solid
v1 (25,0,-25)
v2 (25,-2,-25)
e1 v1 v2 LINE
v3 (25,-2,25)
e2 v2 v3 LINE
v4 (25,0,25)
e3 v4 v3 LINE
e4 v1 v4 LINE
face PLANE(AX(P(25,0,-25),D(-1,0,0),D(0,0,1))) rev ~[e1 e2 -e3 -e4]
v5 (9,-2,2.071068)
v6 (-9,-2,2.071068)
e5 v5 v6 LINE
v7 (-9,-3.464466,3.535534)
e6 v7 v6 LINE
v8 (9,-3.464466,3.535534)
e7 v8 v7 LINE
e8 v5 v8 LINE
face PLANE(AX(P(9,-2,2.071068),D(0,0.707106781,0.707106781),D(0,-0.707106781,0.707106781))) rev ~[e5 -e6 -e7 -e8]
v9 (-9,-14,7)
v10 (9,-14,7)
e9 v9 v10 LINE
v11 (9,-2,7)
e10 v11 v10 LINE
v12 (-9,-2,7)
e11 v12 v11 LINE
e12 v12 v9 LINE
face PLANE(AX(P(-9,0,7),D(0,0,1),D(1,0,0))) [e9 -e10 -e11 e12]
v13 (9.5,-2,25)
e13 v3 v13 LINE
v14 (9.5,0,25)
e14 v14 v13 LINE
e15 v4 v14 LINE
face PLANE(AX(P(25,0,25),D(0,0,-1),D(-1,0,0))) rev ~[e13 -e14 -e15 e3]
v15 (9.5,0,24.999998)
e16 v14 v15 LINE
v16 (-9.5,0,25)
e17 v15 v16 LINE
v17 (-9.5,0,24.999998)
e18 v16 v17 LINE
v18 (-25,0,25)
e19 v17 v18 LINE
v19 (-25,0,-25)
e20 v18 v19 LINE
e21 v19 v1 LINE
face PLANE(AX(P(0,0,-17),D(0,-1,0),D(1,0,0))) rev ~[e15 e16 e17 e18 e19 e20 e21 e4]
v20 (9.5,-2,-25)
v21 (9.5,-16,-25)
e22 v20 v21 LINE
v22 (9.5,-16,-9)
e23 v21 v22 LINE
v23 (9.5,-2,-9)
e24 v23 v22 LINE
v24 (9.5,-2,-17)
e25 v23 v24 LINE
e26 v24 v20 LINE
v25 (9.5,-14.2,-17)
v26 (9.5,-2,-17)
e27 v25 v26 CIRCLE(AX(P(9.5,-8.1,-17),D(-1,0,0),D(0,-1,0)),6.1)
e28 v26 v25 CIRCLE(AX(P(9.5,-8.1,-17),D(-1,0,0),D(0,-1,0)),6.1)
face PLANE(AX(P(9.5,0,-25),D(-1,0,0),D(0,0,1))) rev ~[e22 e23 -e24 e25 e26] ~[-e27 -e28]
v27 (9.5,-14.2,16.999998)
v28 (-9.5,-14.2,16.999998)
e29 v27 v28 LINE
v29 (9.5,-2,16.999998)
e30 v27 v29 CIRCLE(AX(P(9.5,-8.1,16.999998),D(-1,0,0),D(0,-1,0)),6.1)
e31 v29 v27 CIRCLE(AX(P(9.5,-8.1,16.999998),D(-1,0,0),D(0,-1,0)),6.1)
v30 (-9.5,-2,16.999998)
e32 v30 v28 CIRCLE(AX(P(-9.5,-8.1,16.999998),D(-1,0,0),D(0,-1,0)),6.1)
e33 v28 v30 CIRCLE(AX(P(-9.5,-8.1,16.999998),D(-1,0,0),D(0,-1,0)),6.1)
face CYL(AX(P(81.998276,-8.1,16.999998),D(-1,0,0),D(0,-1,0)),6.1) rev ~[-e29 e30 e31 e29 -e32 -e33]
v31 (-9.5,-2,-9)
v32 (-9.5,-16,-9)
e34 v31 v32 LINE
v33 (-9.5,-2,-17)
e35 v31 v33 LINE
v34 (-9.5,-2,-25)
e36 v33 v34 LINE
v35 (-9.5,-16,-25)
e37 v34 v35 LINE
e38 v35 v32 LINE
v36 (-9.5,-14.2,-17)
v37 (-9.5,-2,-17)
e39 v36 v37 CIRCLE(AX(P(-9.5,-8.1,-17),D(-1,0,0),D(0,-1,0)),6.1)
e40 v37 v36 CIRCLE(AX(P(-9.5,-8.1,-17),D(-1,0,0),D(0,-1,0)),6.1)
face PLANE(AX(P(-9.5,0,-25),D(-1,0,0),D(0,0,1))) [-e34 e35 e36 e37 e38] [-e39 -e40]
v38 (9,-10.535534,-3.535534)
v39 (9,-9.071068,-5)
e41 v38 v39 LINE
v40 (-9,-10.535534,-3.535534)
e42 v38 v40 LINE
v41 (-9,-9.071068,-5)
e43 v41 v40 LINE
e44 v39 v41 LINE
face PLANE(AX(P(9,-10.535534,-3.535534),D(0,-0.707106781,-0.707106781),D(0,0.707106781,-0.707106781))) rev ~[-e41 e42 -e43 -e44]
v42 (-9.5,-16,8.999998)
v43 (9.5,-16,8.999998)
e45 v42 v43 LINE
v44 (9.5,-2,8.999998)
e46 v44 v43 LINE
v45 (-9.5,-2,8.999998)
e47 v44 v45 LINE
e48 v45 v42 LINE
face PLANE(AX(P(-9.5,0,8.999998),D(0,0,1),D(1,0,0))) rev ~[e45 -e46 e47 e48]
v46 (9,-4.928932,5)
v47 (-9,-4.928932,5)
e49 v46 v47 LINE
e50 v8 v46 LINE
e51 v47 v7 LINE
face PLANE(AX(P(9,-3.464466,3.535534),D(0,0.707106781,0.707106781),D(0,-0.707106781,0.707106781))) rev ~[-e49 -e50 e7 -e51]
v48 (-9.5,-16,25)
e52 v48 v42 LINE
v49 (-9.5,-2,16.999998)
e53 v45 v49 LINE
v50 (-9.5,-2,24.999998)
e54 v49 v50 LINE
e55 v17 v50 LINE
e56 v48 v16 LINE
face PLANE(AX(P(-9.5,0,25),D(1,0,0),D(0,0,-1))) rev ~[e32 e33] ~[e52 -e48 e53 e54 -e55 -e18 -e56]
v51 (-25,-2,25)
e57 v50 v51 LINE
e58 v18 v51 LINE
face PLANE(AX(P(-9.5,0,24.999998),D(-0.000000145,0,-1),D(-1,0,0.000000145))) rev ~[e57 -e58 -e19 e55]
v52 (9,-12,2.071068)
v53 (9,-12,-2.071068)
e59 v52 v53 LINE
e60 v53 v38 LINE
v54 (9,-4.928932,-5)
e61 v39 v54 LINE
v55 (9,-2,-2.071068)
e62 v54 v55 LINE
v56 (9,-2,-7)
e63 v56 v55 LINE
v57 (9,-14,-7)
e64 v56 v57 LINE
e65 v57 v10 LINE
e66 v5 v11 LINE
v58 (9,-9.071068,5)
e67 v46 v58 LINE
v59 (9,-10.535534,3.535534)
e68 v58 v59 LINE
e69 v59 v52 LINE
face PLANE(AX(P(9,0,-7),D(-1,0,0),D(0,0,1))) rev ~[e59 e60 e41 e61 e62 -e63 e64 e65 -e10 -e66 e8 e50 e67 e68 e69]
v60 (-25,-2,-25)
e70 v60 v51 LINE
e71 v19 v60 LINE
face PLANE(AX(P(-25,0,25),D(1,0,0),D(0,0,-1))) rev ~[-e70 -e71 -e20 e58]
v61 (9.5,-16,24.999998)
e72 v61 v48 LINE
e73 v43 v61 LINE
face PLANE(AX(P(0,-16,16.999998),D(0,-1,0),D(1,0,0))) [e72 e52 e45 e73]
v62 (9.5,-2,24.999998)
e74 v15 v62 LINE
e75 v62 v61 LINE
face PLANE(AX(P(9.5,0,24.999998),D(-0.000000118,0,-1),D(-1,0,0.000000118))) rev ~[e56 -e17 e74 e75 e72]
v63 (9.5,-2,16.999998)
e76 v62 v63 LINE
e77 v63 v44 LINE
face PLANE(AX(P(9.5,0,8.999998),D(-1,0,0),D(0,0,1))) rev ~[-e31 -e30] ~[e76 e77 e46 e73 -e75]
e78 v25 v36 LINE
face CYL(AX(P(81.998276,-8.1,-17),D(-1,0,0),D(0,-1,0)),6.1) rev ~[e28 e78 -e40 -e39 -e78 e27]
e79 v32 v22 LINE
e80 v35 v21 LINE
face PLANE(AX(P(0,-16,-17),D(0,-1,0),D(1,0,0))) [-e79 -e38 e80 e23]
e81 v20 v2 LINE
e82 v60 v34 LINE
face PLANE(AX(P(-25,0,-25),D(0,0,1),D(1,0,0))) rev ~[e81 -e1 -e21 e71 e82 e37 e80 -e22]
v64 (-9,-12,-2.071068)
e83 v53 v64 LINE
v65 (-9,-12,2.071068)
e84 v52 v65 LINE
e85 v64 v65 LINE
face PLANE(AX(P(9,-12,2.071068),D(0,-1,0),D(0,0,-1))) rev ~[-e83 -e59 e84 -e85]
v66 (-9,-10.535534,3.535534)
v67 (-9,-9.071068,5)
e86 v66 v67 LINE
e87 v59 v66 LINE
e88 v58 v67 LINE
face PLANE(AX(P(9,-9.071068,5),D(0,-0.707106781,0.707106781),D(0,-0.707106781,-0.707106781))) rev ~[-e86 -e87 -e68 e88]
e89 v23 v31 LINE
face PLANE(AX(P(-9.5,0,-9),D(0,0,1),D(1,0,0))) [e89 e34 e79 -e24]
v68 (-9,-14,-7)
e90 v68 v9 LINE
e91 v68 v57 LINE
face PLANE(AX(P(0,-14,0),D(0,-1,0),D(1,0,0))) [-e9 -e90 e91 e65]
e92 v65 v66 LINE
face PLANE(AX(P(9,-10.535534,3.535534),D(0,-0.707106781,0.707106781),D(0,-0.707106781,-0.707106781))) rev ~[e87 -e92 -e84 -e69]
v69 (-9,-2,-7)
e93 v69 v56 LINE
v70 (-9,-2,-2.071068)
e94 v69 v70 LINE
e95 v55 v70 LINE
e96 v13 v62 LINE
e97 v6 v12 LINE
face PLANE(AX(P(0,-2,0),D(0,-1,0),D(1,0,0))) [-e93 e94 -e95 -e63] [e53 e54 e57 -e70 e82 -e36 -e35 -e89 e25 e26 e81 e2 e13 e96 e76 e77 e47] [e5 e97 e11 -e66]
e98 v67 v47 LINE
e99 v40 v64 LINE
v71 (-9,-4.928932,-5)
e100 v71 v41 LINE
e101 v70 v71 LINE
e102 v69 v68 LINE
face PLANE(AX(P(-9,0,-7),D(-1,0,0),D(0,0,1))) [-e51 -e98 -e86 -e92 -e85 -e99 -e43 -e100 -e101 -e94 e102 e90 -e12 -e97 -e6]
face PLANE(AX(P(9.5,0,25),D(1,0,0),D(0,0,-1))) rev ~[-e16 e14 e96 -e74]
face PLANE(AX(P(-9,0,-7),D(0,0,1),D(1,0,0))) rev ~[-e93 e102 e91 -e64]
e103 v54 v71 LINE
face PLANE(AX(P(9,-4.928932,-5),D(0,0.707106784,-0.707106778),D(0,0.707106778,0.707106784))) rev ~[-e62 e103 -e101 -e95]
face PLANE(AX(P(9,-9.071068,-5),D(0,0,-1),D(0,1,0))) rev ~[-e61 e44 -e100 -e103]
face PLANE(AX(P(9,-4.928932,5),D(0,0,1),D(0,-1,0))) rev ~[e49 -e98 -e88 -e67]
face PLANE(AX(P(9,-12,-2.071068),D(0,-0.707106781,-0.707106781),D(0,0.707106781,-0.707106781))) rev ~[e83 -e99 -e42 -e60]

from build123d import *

# Parameters (mm, degrees)
F0_W     = 18
F0_H     = 14
F0_W_2   = 19
F0_H_2   = 16
F1_DEPTH = 2
F2_DEPTH = 14
F3_DEPTH = 16
F5_D     = 12.2
F7_D     = 12.2
F9_DEPTH = 25


# Not quite as in the source:
# - ends of sketch curves that miss each other by under 0.0002 mm in the source are joined


with BuildPart() as f1:
    # F0 (on Front) → F1 (new body)
    with BuildSketch(Plane.XZ):
        Polygon((9.5000003055, -25), (25, -25), (25, 25), (9.5000003055, 25), (9.5000003055, 8.9999977499), (-9.4999996945, 8.9999977499), (-9.4999996945, 24.9999977499), (-25, 25), (-25, -25), (-9.4999996945, -25), (-9.4999996945, -9), (9.5000003055, -9), align=None)
        Rectangle(F0_W, F0_H, mode=Mode.SUBTRACT)
        with Locations((3.055e-07, -17)):
            Rectangle(F0_W_2, F0_H_2)
        Polygon((9.5000003055, 8.9999977499), (9.5000003055, 24.9999977499), (-9.4999996945, 25), (-9.4999996945, 8.9999977499), align=None)
    extrude(amount=F1_DEPTH)

    # F0 (on Front) → F2 (join)
    with BuildSketch(Plane.XZ):
        Rectangle(F0_W, F0_H)
    extrude(amount=F2_DEPTH)

    # F0 (on Front) → F3 (join)
    with BuildSketch(Plane.XZ):
        with Locations((3.055e-07, -17)):
            Rectangle(F0_W_2, F0_H_2)
        Polygon((9.5000003055, 8.9999977499), (9.5000003055, 24.9999977499), (-9.4999996945, 25), (-9.4999996945, 8.9999977499), align=None)
    extrude(amount=F3_DEPTH)

    # F5 (through all)
    with Locations(Plane.YZ.offset(9.5000003055)):
        with Locations((-8.1, -17)):
            Hole(F5_D / 2)

    # F7 (through all)
    with Locations(Plane.YZ.offset(9.5000003055)):
        with Locations((-8.1, 16.9999977499)):
            Hole(F7_D / 2)

    # F8 (on face) → F9 (cut)
    with BuildSketch(Plane.YZ.offset(9)):
        with BuildLine():
            Line((-12.0000001043, -2.0710677001), (-10.5355339977, -3.5355338068))
            ThreePointArc((-10.5355339977, -3.5355338068), (-11.6193977653, -1.9134170539), (-12.0000001043, 1.212e-07))
            Line((-12.0000001043, 1.212e-07), (-12.0000001043, -2.0710677001))
        make_face()
        with BuildLine():
            ThreePointArc((-2.0000001043, 1.118e-07), (-2.3806024392, 1.9134172673), (-3.4644661888, 3.5355340081))
            ThreePointArc((-3.4644661888, 3.5355340081), (-5.0865829362, 4.6193977717), (-7.0000001043, 5.0000001118))
            ThreePointArc((-7.0000001043, 5.0000001118), (-8.9134172661, 4.6193977743), (-10.5355340102, 3.5355340177))
            ThreePointArc((-10.5355340102, 3.5355340177), (-11.6193977651, 1.9134172779), (-12.0000001043, 1.212e-07))
            ThreePointArc((-12.0000001043, 1.212e-07), (-11.6193977653, -1.9134170539), (-10.5355339977, -3.5355338068))
            ThreePointArc((-10.5355339977, -3.5355338068), (-8.9134172579, -4.6193975542), (-7.0000001043, -4.9999998882))
            ThreePointArc((-7.0000001043, -4.9999998882), (-5.0865829425, -4.6193975508), (-3.4644661984, -3.5355337942))
            ThreePointArc((-3.4644661984, -3.5355337942), (-2.3806024418, -1.9134170501), (-2.0000001043, 1.118e-07))
        make_face()
        with BuildLine():
            ThreePointArc((-12.0000001043, 1.212e-07), (-11.6193977651, 1.9134172779), (-10.5355340102, 3.5355340177))
            Line((-10.5355340102, 3.5355340177), (-12.0000001043, 2.0710679236))
            Line((-12.0000001043, 2.0710679236), (-12.0000001043, 1.212e-07))
        make_face()
        with BuildLine():
            ThreePointArc((-10.5355340102, 3.5355340177), (-8.9134172661, 4.6193977743), (-7.0000001043, 5.0000001118))
            Line((-7.0000001043, 5.0000001118), (-9.0710679162, 5.0000001118))
            Line((-9.0710679162, 5.0000001118), (-10.5355340102, 3.5355340177))
        make_face()
        with BuildLine():
            ThreePointArc((-7.0000001043, 5.0000001118), (-5.0865829362, 4.6193977717), (-3.4644661888, 3.5355340081))
            Line((-3.4644661888, 3.5355340081), (-4.9289322924, 5.0000001118))
            Line((-4.9289322924, 5.0000001118), (-7.0000001043, 5.0000001118))
        make_face()
        with BuildLine():
            Line((-3.4644661984, -3.5355337942), (-2.0000000522, -2.071067648))
            Line((-2.0000001043, -2.071067648), (-2.0000001043, 1.118e-07))
            ThreePointArc((-2.0000001043, 1.118e-07), (-2.3806024418, -1.9134170501), (-3.4644661984, -3.5355337942))
        make_face()
        with BuildLine():
            Line((-2.0000001043, 1.118e-07), (-2.0000001043, 2.0710678715))
            Line((-2.0000000522, 2.0710678715), (-3.4644661888, 3.5355340081))
            ThreePointArc((-3.4644661888, 3.5355340081), (-2.3806024392, 1.9134172673), (-2.0000001043, 1.118e-07))
        make_face()
        with BuildLine():
            Line((-4.9289322924, -4.9999998882), (-3.4644661984, -3.5355337942))
            ThreePointArc((-3.4644661984, -3.5355337942), (-5.0865829425, -4.6193975508), (-7.0000001043, -4.9999998882))
            Line((-7.0000001043, -4.9999998882), (-4.9289322924, -4.9999998882))
        make_face()
        with BuildLine():
            Line((-9.0710679162, -4.9999998882), (-7.0000001043, -4.9999998882))
            ThreePointArc((-7.0000001043, -4.9999998882), (-8.9134172579, -4.6193975542), (-10.5355339977, -3.5355338068))
            Line((-10.5355339977, -3.5355338068), (-9.0710679162, -4.9999998882))
        make_face()
    extrude(amount=-F9_DEPTH, mode=Mode.SUBTRACT)


solid = f1.part
